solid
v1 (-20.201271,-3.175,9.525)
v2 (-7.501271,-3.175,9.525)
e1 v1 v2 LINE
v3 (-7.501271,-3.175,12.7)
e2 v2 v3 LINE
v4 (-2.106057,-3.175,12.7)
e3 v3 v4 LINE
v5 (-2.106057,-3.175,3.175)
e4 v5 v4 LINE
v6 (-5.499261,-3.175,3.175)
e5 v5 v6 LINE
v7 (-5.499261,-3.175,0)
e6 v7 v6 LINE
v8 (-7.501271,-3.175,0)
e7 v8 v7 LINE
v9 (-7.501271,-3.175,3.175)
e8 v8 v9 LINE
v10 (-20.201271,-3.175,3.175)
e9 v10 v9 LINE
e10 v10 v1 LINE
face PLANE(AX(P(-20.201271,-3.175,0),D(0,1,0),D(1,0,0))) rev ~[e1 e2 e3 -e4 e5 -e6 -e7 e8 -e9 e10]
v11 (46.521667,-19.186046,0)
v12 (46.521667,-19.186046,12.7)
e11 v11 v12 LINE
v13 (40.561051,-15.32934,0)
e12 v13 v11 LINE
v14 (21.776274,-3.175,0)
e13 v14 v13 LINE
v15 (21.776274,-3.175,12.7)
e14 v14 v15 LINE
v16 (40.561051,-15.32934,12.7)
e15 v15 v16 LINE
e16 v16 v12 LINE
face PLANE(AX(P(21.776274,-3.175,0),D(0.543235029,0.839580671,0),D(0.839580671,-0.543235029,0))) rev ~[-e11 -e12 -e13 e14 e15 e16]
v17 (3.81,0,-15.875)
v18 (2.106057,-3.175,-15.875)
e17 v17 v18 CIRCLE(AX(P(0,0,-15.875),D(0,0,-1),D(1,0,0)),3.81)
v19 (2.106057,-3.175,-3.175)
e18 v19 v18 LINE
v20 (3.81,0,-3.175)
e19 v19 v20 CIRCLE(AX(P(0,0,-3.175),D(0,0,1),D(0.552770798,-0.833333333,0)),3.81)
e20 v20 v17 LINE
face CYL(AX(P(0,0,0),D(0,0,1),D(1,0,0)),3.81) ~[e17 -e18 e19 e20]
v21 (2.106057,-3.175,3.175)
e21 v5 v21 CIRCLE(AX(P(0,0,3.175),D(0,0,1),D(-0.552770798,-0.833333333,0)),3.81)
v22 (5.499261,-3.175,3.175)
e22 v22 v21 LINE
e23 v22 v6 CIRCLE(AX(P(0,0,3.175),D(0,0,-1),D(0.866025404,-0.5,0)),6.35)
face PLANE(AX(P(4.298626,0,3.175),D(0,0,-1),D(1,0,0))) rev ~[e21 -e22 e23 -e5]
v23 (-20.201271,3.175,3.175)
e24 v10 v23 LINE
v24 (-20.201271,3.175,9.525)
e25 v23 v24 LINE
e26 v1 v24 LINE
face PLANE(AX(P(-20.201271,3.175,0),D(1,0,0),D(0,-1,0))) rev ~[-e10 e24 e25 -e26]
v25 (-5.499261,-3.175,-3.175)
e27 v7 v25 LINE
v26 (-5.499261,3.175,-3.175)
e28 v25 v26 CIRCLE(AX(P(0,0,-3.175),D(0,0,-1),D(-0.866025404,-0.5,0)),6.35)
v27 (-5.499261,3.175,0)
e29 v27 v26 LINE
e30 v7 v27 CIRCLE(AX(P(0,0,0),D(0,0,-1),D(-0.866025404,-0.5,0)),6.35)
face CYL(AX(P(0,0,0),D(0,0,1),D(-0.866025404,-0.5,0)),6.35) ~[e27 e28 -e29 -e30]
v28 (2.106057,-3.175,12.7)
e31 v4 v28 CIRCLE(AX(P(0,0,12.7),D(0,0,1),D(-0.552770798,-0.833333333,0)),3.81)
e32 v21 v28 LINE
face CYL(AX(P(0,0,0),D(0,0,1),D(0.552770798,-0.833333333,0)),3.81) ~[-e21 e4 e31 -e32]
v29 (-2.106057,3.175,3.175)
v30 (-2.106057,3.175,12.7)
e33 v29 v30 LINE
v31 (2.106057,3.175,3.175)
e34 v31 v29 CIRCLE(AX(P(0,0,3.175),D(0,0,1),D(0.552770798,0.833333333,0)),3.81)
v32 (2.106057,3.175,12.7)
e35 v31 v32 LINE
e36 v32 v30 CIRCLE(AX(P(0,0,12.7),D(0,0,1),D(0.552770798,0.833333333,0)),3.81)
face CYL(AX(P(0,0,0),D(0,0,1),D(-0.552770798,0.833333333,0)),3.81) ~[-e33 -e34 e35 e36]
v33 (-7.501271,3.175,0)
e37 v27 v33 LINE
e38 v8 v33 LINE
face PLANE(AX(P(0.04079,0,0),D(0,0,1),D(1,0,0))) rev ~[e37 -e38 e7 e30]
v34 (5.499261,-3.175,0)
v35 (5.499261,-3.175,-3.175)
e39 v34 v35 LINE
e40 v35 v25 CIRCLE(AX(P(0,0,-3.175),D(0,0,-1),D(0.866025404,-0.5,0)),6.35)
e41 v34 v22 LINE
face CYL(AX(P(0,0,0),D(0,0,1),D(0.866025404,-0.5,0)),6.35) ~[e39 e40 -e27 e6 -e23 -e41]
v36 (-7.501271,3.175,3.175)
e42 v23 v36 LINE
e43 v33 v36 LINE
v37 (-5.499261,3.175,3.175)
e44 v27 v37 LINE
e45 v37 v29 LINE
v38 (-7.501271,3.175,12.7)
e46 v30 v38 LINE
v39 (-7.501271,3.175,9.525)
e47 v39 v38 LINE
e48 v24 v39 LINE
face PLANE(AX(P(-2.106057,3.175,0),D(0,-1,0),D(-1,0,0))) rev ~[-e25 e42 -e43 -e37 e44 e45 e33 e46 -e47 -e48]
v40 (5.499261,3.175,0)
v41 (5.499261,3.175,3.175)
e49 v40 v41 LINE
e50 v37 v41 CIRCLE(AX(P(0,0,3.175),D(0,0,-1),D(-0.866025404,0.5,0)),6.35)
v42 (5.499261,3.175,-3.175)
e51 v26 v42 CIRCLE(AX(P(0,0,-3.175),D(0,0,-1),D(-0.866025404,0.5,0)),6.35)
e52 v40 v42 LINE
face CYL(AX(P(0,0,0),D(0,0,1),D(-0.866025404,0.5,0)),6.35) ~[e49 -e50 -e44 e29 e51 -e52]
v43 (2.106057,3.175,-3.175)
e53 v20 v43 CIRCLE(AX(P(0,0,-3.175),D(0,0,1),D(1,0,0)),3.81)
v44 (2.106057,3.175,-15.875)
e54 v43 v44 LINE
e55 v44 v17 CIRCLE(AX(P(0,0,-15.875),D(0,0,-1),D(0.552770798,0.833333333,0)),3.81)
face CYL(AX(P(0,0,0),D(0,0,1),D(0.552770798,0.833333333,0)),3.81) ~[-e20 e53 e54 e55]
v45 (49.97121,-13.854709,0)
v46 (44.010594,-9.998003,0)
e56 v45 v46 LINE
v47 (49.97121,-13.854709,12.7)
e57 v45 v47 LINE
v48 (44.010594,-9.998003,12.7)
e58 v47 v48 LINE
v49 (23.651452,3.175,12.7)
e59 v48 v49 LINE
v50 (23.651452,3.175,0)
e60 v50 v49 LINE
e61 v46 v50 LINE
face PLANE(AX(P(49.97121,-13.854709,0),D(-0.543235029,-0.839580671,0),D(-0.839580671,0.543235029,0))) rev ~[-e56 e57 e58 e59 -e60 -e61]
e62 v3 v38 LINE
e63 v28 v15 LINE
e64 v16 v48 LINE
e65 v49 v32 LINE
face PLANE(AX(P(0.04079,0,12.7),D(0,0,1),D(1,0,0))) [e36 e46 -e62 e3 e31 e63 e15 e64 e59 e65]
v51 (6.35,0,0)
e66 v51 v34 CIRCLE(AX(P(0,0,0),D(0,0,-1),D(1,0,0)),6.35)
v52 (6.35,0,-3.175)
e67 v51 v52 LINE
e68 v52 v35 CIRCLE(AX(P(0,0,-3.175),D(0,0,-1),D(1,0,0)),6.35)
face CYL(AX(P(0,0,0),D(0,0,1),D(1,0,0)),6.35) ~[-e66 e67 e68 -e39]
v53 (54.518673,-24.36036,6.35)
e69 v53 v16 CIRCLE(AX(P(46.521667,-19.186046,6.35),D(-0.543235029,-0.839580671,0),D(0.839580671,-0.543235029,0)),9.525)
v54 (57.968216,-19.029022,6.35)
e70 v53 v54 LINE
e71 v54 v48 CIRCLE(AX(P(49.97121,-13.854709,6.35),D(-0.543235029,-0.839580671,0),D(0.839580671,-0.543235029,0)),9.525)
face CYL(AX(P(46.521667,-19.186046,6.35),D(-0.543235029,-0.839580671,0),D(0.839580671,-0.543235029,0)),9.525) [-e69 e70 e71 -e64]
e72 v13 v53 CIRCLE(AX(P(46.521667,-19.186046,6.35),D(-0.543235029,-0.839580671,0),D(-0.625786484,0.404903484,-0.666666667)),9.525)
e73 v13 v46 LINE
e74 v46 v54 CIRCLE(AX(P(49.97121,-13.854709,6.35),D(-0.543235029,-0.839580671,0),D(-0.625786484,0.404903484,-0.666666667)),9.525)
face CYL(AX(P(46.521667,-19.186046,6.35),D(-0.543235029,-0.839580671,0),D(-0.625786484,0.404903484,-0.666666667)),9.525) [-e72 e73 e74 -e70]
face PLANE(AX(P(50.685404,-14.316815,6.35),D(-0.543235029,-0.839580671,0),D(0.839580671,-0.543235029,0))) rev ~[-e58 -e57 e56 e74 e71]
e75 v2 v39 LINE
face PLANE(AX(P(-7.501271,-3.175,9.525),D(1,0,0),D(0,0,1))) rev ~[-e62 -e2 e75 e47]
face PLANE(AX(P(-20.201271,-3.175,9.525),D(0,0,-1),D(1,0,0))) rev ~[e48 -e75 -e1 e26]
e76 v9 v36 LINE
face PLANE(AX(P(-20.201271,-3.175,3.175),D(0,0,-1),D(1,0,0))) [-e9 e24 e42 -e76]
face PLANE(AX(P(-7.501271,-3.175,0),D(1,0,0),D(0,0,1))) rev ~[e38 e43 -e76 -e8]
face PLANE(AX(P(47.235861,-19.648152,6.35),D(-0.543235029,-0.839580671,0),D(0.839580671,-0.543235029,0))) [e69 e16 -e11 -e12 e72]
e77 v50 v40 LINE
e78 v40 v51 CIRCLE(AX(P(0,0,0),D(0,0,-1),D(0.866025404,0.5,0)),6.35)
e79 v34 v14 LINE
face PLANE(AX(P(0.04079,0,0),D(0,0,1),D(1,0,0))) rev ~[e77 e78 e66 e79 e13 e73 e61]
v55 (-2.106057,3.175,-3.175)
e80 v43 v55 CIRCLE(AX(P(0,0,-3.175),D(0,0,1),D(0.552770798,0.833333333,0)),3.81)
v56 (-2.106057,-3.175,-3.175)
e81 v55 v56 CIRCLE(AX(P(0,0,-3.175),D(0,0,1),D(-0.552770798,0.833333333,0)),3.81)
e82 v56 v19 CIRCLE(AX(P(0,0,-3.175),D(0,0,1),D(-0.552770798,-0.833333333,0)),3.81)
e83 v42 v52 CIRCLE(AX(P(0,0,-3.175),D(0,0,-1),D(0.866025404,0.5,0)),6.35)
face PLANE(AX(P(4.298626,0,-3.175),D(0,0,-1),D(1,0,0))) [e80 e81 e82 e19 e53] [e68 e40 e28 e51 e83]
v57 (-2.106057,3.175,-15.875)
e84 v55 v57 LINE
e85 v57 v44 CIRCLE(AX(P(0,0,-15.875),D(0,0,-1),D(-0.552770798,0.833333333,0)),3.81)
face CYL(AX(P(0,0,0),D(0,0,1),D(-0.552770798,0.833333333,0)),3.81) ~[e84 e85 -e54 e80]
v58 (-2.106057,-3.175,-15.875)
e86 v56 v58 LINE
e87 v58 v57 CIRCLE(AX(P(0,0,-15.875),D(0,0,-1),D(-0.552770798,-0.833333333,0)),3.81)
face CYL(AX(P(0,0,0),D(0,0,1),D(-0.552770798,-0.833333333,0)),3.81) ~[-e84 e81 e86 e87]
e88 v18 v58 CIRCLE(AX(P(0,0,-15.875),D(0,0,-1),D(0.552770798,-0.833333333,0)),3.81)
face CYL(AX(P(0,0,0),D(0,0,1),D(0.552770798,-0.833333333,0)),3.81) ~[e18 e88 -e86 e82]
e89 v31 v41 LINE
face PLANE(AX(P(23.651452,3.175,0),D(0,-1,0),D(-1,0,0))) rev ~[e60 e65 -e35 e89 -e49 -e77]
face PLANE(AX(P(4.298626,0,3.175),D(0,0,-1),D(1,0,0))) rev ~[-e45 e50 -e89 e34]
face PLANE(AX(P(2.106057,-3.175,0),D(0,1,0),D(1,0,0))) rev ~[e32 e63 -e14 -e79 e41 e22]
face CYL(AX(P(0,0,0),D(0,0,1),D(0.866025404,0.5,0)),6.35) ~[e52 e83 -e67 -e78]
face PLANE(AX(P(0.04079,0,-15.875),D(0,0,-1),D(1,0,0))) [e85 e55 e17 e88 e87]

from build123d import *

# Parameters (mm, degrees)
F1_DEPTH = 12.7
F3_DEPTH = 15.875
F4_DEPTH = 3.175
F6_DEPTH = 6.349999961
F7_W     = 12.7
F7_H     = 3.175
F8_DEPTH = 9.526


with BuildPart() as f1:
    # F0 (on Top) → F1 (new body)
    with BuildSketch(Plane.XY):
        with BuildLine():
            ThreePointArc((2.1060567419, -3.175), (3.3570951868, -1.8016692001), (3.81, 0))
            ThreePointArc((3.81, 0), (3.3570951868, 1.8016692001), (2.1060567419, 3.175))
            ThreePointArc((2.1060567419, 3.175), (0, 3.81), (-2.1060567419, 3.175))
            ThreePointArc((-2.1060567419, 3.175), (-3.81, 0), (-2.1060567419, -3.175))
            ThreePointArc((-2.1060567419, -3.175), (0, -3.81), (2.1060567419, -3.175))
        make_face()
        with BuildLine():
            ThreePointArc((2.1060567419, 3.175), (3.3570951868, 1.8016692001), (3.81, 0))
            ThreePointArc((3.81, 0), (3.3570951868, -1.8016692001), (2.1060567419, -3.175))
            Line((2.1060567419, -3.175), (21.7762735865, -3.175))
            Line((21.7762735865, -3.175), (46.5216673911, -19.1860459745))
            Line((46.5216673911, -19.1860459745), (49.9712098046, -13.8547087462))
            Line((49.9712098046, -13.8547087462), (23.6514521839, 3.175))
            Line((23.6514521839, 3.175), (2.1060567419, 3.175))
        make_face()
        with BuildLine():
            ThreePointArc((-2.1060567419, -3.175), (-3.81, 0), (-2.1060567419, 3.175))
            Line((-2.1060567419, 3.175), (-20.2012713999, 3.175))
            Line((-20.2012713999, 3.175), (-20.2012713999, -3.175))
            Line((-20.2012713999, -3.175), (-2.1060567419, -3.175))
        make_face()
    extrude(amount=F1_DEPTH)

    # F2 (on face) → F3 (join)
    with BuildSketch(Plane(origin=(0, 0, 0), x_dir=(1, 0, 0), z_dir=(0, 0, -1))):
        with BuildLine():
            ThreePointArc((2.1060567419, -3.175), (3.3570951868, -1.8016692001), (3.81, 0))
            ThreePointArc((3.81, 0), (3.3570951868, 1.8016692001), (2.1060567419, 3.175))
            ThreePointArc((2.1060567419, 3.175), (0, 3.81), (-2.1060567419, 3.175))
            ThreePointArc((-2.1060567419, 3.175), (-3.81, 0), (-2.1060567419, -3.175))
            ThreePointArc((-2.1060567419, -3.175), (0, -3.81), (2.1060567419, -3.175))
        make_face()
    extrude(amount=F3_DEPTH)

    # F2 (on face) → F4 (join, symmetric)
    with BuildSketch(Plane(origin=(0, 0, 0), x_dir=(1, 0, 0), z_dir=(0, 0, -1))):
        with BuildLine():
            ThreePointArc((2.1060567419, 3.175), (3.3570951868, 1.8016692001), (3.81, 0))
            ThreePointArc((3.81, 0), (3.3570951868, -1.8016692001), (2.1060567419, -3.175))
            Line((2.1060567419, -3.175), (5.499261314, -3.175))
            ThreePointArc((5.499261314, -3.175), (6.1336289969, -1.6435009364), (6.35, 0))
            ThreePointArc((6.35, 0), (6.1336289969, 1.6435009364), (5.499261314, 3.175))
            Line((5.499261314, 3.175), (2.1060567419, 3.175))
        make_face()
        with BuildLine():
            ThreePointArc((-2.1060567419, 3.175), (0, 3.81), (2.1060567419, 3.175))
            Line((2.1060567419, 3.175), (5.499261314, 3.175))
            ThreePointArc((5.499261314, 3.175), (0, 6.35), (-5.499261314, 3.175))
            Line((-5.499261314, 3.175), (-2.1060567419, 3.175))
        make_face()
        with BuildLine():
            Line((5.499261314, -3.175), (2.1060567419, -3.175))
            ThreePointArc((2.1060567419, -3.175), (0, -3.81), (-2.1060567419, -3.175))
            Line((-2.1060567419, -3.175), (-5.499261314, -3.175))
            ThreePointArc((-5.499261314, -3.175), (0, -6.35), (5.499261314, -3.175))
        make_face()
        with BuildLine():
            ThreePointArc((-2.1060567419, -3.175), (-3.81, 0), (-2.1060567419, 3.175))
            Line((-2.1060567419, 3.175), (-5.499261314, 3.175))
            ThreePointArc((-5.499261314, 3.175), (-6.35, 0), (-5.499261314, -3.175))
            Line((-5.499261314, -3.175), (-2.1060567419, -3.175))
        make_face()
    extrude(amount=F4_DEPTH, both=True)

    # F5 (on face) → F6 (join, through all)
    with BuildSketch(Plane(origin=(4.9781873283, 7.6938887107, 0), x_dir=(0.839580671, -0.5432350291, 0), z_dir=(-0.5432350291, -0.839580671, 0))):
        with BuildLine():
            ThreePointArc((42.3817091402, 0), (52.8799553739, -2.5479917191), (59.0062249688, 6.35))
            ThreePointArc((59.0062249688, 6.35), (52.8799553739, 15.2479917191), (42.3817091402, 12.7))
            Line((42.3817091402, 12.7), (49.4812249688, 12.7))
            Line((49.4812249688, 12.7), (49.4812249688, 0))
            Line((49.4812249688, 0), (42.3817091402, 0))
        make_face()
        with BuildLine():
            Line((49.4812249688, 12.7), (42.3817091402, 12.7))
            ThreePointArc((42.3817091402, 12.7), (39.9562249688, 6.35), (42.3817091402, 0))
            Line((42.3817091402, 0), (49.4812249688, 0))
            Line((49.4812249688, 0), (49.4812249688, 12.7))
        make_face()
    extrude(amount=-F6_DEPTH)

    # F7 (on face) → F8 (cut, through all)
    with BuildSketch(Plane.XZ.offset(3.175)):
        with Locations((-13.8512713999, 11.1125)):
            Rectangle(F7_W, F7_H)
        with Locations((-13.8512713999, 1.5875)):
            Rectangle(F7_W, F7_H)
    extrude(amount=-F8_DEPTH, mode=Mode.SUBTRACT)


solid = f1.part
